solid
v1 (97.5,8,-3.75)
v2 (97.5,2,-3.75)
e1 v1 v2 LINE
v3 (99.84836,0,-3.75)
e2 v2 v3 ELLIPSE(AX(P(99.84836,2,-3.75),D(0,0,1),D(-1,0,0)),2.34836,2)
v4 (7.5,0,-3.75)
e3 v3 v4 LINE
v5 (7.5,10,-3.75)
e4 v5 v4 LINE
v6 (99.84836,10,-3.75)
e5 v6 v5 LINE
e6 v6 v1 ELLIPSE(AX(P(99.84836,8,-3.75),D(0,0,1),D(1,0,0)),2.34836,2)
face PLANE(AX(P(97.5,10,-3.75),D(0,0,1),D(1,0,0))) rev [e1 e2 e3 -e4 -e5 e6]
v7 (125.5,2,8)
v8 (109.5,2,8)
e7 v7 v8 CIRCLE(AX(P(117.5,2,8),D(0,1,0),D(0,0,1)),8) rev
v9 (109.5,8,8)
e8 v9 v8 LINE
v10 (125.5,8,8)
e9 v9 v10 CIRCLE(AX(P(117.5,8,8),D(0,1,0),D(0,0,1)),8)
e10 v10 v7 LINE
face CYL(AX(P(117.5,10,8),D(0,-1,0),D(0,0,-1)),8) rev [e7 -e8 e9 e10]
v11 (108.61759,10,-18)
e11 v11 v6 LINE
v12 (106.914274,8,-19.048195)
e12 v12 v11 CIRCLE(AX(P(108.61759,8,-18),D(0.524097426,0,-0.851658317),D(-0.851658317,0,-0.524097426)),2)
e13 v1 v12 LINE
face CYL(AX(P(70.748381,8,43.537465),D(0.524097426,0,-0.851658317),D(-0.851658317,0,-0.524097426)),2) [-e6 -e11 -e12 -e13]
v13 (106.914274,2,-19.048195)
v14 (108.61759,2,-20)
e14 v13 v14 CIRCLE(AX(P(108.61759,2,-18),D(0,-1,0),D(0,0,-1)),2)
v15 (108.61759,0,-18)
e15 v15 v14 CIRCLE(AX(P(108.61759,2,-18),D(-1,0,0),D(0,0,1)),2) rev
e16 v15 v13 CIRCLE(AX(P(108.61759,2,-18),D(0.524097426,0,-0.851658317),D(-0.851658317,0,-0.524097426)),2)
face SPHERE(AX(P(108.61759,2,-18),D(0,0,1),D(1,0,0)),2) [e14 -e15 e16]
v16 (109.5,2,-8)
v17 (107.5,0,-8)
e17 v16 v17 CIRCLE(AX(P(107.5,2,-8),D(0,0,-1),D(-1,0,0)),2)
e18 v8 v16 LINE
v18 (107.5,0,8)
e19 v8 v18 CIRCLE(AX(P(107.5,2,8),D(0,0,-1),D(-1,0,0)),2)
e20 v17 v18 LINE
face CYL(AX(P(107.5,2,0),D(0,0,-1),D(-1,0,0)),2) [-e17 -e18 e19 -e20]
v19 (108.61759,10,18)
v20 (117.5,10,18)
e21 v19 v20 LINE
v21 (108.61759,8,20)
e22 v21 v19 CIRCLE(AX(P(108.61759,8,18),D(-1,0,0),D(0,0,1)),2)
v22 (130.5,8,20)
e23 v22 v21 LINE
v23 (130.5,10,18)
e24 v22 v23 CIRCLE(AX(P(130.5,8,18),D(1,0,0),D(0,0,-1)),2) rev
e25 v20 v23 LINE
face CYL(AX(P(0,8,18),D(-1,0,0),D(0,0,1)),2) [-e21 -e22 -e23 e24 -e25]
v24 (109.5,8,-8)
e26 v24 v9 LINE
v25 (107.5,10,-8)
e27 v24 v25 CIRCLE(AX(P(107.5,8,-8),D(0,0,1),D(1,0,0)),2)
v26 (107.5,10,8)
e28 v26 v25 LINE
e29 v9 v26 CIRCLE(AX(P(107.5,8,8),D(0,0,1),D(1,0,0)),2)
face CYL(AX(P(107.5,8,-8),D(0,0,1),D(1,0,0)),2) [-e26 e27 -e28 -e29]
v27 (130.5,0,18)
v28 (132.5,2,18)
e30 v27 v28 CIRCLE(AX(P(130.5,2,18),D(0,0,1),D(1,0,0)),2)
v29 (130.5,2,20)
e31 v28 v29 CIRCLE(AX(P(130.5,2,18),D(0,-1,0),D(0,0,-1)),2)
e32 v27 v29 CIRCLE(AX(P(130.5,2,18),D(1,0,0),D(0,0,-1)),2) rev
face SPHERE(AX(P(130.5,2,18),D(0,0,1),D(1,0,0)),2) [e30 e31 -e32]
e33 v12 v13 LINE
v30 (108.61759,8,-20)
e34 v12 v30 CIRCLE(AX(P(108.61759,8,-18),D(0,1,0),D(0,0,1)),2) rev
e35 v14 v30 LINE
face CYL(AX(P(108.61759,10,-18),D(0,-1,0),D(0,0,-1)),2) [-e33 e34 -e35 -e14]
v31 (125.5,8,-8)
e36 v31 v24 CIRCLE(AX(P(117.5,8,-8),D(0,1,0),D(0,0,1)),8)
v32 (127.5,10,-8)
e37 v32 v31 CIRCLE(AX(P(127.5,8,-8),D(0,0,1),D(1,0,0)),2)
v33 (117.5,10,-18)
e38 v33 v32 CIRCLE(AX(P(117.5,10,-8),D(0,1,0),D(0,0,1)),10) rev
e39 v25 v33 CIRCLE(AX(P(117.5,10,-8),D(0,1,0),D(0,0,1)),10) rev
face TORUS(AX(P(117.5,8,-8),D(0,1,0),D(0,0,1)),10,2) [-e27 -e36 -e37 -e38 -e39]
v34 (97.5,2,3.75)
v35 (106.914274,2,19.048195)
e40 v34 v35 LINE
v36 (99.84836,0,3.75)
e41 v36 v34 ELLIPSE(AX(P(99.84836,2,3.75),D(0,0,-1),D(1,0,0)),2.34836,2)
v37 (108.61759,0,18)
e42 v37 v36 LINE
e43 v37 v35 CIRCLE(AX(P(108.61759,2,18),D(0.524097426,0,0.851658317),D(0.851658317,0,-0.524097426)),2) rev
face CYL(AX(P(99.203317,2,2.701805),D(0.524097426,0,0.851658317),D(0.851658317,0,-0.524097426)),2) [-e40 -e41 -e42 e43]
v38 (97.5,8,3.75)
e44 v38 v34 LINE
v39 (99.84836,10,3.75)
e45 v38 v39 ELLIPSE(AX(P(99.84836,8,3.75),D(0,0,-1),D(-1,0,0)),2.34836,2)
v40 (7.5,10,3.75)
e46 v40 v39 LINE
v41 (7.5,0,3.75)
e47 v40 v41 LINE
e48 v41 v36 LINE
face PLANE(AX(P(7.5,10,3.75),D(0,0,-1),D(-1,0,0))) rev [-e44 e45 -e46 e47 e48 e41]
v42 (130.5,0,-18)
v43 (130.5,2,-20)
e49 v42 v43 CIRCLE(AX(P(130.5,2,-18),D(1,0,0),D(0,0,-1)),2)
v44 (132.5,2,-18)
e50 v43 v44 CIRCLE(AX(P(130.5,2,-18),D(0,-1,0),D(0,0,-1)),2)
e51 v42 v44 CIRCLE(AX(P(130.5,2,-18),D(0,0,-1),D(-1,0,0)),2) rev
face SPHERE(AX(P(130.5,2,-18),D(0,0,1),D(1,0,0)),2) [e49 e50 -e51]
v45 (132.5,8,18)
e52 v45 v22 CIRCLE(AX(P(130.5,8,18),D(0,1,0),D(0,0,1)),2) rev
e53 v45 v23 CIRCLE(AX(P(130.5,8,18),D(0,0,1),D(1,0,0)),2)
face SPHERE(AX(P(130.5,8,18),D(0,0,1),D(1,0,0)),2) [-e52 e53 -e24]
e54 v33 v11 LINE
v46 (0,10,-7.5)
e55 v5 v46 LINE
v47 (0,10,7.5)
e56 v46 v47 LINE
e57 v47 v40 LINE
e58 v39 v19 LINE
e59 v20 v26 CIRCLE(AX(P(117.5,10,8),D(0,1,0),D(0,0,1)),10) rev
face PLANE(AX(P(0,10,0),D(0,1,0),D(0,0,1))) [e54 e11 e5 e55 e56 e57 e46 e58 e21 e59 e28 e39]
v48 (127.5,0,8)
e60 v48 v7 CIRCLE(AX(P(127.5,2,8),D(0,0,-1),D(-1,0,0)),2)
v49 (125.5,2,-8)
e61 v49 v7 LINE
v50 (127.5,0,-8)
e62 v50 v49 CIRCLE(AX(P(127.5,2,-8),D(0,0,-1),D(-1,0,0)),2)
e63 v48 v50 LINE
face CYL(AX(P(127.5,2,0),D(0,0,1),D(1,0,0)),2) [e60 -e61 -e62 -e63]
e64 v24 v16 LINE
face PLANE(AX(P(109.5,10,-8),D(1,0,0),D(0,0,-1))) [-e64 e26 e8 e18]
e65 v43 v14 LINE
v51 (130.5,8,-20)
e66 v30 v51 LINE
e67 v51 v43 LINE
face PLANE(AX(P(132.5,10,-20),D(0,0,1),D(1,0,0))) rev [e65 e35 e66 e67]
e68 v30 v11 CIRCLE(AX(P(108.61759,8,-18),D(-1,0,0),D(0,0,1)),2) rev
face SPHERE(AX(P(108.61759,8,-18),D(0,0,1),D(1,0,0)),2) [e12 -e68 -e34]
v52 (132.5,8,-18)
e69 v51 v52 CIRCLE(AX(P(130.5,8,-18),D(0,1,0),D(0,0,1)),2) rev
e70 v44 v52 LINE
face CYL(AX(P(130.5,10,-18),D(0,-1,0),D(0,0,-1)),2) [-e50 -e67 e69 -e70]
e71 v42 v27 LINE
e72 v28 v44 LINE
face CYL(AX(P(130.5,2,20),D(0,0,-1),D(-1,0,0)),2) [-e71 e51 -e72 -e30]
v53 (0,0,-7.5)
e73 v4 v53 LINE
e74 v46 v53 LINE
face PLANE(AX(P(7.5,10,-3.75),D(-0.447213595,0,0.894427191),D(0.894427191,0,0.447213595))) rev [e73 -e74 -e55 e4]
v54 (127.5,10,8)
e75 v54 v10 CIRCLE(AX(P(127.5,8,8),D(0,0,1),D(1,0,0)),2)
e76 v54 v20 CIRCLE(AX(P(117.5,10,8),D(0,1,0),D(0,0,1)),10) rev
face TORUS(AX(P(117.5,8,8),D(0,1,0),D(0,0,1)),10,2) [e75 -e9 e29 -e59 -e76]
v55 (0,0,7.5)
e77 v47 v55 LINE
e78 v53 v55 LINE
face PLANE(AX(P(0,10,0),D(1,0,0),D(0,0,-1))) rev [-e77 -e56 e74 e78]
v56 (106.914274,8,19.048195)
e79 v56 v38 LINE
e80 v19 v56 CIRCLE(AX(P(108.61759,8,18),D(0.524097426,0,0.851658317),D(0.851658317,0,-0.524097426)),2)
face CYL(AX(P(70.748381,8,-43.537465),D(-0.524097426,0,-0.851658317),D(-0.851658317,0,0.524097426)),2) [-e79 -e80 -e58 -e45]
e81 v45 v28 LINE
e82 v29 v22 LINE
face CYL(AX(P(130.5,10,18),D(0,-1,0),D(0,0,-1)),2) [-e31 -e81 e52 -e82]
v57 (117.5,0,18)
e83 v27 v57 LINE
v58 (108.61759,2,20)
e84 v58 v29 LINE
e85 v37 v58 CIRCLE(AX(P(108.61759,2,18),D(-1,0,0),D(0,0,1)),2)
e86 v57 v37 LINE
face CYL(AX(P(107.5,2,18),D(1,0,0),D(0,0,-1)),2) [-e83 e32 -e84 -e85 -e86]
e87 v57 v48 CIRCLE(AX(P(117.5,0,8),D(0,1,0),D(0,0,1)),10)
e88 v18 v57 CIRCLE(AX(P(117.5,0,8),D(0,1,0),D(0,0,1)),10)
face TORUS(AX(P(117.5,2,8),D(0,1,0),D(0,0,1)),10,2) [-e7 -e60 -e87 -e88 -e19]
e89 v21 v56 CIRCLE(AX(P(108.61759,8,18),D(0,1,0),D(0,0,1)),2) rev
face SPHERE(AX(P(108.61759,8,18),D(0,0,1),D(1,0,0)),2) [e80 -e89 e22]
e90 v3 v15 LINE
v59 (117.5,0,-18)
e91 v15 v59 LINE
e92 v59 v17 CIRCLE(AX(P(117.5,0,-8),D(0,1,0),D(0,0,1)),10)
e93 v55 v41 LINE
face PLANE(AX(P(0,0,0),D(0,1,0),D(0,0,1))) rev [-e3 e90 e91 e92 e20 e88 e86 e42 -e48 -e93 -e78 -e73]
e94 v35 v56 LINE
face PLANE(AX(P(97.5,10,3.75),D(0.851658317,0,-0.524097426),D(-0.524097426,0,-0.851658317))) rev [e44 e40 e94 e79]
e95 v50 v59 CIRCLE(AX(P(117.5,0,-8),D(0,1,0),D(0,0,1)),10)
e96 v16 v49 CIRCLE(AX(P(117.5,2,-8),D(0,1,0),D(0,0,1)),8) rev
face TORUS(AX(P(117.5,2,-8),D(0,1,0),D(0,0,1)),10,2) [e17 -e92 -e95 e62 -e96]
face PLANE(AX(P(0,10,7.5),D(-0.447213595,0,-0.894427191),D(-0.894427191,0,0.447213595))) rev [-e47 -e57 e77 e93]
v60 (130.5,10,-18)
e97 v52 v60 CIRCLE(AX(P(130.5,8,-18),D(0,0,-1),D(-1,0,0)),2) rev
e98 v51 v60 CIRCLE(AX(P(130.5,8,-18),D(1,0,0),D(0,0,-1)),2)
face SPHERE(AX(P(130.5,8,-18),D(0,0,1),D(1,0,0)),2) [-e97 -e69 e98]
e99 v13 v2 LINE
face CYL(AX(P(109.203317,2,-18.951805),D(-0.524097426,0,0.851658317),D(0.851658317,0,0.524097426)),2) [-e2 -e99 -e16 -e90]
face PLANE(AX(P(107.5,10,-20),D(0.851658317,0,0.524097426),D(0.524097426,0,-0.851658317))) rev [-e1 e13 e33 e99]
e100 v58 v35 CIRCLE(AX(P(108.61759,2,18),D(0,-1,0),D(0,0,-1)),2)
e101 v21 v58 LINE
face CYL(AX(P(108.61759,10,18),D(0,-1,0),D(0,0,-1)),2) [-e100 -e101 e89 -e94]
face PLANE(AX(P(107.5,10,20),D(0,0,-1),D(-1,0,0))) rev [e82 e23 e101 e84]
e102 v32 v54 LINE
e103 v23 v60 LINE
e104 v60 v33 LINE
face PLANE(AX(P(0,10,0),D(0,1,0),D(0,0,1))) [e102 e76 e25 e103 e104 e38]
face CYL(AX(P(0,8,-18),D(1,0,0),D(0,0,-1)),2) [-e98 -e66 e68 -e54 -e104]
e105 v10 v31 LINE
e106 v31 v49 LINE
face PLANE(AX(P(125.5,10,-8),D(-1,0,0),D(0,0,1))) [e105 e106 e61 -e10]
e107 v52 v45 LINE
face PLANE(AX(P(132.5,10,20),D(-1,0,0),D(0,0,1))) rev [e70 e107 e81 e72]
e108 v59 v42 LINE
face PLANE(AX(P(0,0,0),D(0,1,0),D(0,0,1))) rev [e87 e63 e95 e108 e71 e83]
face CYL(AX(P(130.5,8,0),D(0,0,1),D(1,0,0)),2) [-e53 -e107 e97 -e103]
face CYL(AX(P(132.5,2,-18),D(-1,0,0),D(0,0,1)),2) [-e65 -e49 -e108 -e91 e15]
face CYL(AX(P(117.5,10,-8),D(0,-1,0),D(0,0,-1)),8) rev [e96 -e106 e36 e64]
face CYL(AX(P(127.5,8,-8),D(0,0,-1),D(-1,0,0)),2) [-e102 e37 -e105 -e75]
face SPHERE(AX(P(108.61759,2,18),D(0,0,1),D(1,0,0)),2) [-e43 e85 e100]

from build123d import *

# Parameters (mm, degrees)
BOSS_EXTRUDE1_DEPTH = 10
FILLET1_R           = 2
FILLET2_R           = 2


with BuildPart() as part:
    # Sketch1 → Boss-Extrude1 (new body)
    with BuildSketch(Plane(origin=(0, 0, 0), x_dir=(1, 0, 0), z_dir=(0, 1, 0))):
        Polygon((0, 0), (0, -7.5), (7.5, -3.75), (97.5, -3.75), (107.5, -20), (132.5, -20), (132.5, 20), (107.5, 20), (97.5, 3.75), (7.5, 3.75), (0, 7.5), align=None)
        with BuildLine():
            Line((125.5, 8), (125.5, -8))
            ThreePointArc((125.5, -8), (117.5, -16), (109.5, -8))
            Line((109.5, -8), (109.5, 8))
            ThreePointArc((109.5, 8), (117.5, 16), (125.5, 8))
        make_face(mode=Mode.SUBTRACT)
    extrude(amount=BOSS_EXTRUDE1_DEPTH)

    # Fillet1
    fillet1_edges = [part.edges().sort_by_distance(p)[0] for p in [
        (117.5, 0, -16),
        (109.5, 0, 0),
        (117.5, 0, 16),
        (125.5, 0, 0),
        (117.5, 10, -16),
        (109.5, 10, 0),
        (117.5, 10, 16),
        (125.5, 10, 0),
    ]]
    fillet(fillet1_edges, radius=FILLET1_R)

    # Fillet2
    fillet2_edges = [part.edges().sort_by_distance(p)[0] for p in [
        (102.5, 0, -11.875),
        (120, 0, -20),
        (132.5, 0, 0),
        (120, 0, 20),
        (102.5, 0, 11.875),
        (102.5, 10, 11.875),
        (107.5, 5, -20),
        (132.5, 5, -20),
        (132.5, 5, 20),
        (107.5, 5, 20),
        (120, 10, 20),
        (132.5, 10, 0),
        (120, 10, -20),
        (102.5, 10, -11.875),
    ]]
    fillet(fillet2_edges, radius=FILLET2_R - 0.0001)  # a hair under: the kernel refuses the full size


solid = part.part
